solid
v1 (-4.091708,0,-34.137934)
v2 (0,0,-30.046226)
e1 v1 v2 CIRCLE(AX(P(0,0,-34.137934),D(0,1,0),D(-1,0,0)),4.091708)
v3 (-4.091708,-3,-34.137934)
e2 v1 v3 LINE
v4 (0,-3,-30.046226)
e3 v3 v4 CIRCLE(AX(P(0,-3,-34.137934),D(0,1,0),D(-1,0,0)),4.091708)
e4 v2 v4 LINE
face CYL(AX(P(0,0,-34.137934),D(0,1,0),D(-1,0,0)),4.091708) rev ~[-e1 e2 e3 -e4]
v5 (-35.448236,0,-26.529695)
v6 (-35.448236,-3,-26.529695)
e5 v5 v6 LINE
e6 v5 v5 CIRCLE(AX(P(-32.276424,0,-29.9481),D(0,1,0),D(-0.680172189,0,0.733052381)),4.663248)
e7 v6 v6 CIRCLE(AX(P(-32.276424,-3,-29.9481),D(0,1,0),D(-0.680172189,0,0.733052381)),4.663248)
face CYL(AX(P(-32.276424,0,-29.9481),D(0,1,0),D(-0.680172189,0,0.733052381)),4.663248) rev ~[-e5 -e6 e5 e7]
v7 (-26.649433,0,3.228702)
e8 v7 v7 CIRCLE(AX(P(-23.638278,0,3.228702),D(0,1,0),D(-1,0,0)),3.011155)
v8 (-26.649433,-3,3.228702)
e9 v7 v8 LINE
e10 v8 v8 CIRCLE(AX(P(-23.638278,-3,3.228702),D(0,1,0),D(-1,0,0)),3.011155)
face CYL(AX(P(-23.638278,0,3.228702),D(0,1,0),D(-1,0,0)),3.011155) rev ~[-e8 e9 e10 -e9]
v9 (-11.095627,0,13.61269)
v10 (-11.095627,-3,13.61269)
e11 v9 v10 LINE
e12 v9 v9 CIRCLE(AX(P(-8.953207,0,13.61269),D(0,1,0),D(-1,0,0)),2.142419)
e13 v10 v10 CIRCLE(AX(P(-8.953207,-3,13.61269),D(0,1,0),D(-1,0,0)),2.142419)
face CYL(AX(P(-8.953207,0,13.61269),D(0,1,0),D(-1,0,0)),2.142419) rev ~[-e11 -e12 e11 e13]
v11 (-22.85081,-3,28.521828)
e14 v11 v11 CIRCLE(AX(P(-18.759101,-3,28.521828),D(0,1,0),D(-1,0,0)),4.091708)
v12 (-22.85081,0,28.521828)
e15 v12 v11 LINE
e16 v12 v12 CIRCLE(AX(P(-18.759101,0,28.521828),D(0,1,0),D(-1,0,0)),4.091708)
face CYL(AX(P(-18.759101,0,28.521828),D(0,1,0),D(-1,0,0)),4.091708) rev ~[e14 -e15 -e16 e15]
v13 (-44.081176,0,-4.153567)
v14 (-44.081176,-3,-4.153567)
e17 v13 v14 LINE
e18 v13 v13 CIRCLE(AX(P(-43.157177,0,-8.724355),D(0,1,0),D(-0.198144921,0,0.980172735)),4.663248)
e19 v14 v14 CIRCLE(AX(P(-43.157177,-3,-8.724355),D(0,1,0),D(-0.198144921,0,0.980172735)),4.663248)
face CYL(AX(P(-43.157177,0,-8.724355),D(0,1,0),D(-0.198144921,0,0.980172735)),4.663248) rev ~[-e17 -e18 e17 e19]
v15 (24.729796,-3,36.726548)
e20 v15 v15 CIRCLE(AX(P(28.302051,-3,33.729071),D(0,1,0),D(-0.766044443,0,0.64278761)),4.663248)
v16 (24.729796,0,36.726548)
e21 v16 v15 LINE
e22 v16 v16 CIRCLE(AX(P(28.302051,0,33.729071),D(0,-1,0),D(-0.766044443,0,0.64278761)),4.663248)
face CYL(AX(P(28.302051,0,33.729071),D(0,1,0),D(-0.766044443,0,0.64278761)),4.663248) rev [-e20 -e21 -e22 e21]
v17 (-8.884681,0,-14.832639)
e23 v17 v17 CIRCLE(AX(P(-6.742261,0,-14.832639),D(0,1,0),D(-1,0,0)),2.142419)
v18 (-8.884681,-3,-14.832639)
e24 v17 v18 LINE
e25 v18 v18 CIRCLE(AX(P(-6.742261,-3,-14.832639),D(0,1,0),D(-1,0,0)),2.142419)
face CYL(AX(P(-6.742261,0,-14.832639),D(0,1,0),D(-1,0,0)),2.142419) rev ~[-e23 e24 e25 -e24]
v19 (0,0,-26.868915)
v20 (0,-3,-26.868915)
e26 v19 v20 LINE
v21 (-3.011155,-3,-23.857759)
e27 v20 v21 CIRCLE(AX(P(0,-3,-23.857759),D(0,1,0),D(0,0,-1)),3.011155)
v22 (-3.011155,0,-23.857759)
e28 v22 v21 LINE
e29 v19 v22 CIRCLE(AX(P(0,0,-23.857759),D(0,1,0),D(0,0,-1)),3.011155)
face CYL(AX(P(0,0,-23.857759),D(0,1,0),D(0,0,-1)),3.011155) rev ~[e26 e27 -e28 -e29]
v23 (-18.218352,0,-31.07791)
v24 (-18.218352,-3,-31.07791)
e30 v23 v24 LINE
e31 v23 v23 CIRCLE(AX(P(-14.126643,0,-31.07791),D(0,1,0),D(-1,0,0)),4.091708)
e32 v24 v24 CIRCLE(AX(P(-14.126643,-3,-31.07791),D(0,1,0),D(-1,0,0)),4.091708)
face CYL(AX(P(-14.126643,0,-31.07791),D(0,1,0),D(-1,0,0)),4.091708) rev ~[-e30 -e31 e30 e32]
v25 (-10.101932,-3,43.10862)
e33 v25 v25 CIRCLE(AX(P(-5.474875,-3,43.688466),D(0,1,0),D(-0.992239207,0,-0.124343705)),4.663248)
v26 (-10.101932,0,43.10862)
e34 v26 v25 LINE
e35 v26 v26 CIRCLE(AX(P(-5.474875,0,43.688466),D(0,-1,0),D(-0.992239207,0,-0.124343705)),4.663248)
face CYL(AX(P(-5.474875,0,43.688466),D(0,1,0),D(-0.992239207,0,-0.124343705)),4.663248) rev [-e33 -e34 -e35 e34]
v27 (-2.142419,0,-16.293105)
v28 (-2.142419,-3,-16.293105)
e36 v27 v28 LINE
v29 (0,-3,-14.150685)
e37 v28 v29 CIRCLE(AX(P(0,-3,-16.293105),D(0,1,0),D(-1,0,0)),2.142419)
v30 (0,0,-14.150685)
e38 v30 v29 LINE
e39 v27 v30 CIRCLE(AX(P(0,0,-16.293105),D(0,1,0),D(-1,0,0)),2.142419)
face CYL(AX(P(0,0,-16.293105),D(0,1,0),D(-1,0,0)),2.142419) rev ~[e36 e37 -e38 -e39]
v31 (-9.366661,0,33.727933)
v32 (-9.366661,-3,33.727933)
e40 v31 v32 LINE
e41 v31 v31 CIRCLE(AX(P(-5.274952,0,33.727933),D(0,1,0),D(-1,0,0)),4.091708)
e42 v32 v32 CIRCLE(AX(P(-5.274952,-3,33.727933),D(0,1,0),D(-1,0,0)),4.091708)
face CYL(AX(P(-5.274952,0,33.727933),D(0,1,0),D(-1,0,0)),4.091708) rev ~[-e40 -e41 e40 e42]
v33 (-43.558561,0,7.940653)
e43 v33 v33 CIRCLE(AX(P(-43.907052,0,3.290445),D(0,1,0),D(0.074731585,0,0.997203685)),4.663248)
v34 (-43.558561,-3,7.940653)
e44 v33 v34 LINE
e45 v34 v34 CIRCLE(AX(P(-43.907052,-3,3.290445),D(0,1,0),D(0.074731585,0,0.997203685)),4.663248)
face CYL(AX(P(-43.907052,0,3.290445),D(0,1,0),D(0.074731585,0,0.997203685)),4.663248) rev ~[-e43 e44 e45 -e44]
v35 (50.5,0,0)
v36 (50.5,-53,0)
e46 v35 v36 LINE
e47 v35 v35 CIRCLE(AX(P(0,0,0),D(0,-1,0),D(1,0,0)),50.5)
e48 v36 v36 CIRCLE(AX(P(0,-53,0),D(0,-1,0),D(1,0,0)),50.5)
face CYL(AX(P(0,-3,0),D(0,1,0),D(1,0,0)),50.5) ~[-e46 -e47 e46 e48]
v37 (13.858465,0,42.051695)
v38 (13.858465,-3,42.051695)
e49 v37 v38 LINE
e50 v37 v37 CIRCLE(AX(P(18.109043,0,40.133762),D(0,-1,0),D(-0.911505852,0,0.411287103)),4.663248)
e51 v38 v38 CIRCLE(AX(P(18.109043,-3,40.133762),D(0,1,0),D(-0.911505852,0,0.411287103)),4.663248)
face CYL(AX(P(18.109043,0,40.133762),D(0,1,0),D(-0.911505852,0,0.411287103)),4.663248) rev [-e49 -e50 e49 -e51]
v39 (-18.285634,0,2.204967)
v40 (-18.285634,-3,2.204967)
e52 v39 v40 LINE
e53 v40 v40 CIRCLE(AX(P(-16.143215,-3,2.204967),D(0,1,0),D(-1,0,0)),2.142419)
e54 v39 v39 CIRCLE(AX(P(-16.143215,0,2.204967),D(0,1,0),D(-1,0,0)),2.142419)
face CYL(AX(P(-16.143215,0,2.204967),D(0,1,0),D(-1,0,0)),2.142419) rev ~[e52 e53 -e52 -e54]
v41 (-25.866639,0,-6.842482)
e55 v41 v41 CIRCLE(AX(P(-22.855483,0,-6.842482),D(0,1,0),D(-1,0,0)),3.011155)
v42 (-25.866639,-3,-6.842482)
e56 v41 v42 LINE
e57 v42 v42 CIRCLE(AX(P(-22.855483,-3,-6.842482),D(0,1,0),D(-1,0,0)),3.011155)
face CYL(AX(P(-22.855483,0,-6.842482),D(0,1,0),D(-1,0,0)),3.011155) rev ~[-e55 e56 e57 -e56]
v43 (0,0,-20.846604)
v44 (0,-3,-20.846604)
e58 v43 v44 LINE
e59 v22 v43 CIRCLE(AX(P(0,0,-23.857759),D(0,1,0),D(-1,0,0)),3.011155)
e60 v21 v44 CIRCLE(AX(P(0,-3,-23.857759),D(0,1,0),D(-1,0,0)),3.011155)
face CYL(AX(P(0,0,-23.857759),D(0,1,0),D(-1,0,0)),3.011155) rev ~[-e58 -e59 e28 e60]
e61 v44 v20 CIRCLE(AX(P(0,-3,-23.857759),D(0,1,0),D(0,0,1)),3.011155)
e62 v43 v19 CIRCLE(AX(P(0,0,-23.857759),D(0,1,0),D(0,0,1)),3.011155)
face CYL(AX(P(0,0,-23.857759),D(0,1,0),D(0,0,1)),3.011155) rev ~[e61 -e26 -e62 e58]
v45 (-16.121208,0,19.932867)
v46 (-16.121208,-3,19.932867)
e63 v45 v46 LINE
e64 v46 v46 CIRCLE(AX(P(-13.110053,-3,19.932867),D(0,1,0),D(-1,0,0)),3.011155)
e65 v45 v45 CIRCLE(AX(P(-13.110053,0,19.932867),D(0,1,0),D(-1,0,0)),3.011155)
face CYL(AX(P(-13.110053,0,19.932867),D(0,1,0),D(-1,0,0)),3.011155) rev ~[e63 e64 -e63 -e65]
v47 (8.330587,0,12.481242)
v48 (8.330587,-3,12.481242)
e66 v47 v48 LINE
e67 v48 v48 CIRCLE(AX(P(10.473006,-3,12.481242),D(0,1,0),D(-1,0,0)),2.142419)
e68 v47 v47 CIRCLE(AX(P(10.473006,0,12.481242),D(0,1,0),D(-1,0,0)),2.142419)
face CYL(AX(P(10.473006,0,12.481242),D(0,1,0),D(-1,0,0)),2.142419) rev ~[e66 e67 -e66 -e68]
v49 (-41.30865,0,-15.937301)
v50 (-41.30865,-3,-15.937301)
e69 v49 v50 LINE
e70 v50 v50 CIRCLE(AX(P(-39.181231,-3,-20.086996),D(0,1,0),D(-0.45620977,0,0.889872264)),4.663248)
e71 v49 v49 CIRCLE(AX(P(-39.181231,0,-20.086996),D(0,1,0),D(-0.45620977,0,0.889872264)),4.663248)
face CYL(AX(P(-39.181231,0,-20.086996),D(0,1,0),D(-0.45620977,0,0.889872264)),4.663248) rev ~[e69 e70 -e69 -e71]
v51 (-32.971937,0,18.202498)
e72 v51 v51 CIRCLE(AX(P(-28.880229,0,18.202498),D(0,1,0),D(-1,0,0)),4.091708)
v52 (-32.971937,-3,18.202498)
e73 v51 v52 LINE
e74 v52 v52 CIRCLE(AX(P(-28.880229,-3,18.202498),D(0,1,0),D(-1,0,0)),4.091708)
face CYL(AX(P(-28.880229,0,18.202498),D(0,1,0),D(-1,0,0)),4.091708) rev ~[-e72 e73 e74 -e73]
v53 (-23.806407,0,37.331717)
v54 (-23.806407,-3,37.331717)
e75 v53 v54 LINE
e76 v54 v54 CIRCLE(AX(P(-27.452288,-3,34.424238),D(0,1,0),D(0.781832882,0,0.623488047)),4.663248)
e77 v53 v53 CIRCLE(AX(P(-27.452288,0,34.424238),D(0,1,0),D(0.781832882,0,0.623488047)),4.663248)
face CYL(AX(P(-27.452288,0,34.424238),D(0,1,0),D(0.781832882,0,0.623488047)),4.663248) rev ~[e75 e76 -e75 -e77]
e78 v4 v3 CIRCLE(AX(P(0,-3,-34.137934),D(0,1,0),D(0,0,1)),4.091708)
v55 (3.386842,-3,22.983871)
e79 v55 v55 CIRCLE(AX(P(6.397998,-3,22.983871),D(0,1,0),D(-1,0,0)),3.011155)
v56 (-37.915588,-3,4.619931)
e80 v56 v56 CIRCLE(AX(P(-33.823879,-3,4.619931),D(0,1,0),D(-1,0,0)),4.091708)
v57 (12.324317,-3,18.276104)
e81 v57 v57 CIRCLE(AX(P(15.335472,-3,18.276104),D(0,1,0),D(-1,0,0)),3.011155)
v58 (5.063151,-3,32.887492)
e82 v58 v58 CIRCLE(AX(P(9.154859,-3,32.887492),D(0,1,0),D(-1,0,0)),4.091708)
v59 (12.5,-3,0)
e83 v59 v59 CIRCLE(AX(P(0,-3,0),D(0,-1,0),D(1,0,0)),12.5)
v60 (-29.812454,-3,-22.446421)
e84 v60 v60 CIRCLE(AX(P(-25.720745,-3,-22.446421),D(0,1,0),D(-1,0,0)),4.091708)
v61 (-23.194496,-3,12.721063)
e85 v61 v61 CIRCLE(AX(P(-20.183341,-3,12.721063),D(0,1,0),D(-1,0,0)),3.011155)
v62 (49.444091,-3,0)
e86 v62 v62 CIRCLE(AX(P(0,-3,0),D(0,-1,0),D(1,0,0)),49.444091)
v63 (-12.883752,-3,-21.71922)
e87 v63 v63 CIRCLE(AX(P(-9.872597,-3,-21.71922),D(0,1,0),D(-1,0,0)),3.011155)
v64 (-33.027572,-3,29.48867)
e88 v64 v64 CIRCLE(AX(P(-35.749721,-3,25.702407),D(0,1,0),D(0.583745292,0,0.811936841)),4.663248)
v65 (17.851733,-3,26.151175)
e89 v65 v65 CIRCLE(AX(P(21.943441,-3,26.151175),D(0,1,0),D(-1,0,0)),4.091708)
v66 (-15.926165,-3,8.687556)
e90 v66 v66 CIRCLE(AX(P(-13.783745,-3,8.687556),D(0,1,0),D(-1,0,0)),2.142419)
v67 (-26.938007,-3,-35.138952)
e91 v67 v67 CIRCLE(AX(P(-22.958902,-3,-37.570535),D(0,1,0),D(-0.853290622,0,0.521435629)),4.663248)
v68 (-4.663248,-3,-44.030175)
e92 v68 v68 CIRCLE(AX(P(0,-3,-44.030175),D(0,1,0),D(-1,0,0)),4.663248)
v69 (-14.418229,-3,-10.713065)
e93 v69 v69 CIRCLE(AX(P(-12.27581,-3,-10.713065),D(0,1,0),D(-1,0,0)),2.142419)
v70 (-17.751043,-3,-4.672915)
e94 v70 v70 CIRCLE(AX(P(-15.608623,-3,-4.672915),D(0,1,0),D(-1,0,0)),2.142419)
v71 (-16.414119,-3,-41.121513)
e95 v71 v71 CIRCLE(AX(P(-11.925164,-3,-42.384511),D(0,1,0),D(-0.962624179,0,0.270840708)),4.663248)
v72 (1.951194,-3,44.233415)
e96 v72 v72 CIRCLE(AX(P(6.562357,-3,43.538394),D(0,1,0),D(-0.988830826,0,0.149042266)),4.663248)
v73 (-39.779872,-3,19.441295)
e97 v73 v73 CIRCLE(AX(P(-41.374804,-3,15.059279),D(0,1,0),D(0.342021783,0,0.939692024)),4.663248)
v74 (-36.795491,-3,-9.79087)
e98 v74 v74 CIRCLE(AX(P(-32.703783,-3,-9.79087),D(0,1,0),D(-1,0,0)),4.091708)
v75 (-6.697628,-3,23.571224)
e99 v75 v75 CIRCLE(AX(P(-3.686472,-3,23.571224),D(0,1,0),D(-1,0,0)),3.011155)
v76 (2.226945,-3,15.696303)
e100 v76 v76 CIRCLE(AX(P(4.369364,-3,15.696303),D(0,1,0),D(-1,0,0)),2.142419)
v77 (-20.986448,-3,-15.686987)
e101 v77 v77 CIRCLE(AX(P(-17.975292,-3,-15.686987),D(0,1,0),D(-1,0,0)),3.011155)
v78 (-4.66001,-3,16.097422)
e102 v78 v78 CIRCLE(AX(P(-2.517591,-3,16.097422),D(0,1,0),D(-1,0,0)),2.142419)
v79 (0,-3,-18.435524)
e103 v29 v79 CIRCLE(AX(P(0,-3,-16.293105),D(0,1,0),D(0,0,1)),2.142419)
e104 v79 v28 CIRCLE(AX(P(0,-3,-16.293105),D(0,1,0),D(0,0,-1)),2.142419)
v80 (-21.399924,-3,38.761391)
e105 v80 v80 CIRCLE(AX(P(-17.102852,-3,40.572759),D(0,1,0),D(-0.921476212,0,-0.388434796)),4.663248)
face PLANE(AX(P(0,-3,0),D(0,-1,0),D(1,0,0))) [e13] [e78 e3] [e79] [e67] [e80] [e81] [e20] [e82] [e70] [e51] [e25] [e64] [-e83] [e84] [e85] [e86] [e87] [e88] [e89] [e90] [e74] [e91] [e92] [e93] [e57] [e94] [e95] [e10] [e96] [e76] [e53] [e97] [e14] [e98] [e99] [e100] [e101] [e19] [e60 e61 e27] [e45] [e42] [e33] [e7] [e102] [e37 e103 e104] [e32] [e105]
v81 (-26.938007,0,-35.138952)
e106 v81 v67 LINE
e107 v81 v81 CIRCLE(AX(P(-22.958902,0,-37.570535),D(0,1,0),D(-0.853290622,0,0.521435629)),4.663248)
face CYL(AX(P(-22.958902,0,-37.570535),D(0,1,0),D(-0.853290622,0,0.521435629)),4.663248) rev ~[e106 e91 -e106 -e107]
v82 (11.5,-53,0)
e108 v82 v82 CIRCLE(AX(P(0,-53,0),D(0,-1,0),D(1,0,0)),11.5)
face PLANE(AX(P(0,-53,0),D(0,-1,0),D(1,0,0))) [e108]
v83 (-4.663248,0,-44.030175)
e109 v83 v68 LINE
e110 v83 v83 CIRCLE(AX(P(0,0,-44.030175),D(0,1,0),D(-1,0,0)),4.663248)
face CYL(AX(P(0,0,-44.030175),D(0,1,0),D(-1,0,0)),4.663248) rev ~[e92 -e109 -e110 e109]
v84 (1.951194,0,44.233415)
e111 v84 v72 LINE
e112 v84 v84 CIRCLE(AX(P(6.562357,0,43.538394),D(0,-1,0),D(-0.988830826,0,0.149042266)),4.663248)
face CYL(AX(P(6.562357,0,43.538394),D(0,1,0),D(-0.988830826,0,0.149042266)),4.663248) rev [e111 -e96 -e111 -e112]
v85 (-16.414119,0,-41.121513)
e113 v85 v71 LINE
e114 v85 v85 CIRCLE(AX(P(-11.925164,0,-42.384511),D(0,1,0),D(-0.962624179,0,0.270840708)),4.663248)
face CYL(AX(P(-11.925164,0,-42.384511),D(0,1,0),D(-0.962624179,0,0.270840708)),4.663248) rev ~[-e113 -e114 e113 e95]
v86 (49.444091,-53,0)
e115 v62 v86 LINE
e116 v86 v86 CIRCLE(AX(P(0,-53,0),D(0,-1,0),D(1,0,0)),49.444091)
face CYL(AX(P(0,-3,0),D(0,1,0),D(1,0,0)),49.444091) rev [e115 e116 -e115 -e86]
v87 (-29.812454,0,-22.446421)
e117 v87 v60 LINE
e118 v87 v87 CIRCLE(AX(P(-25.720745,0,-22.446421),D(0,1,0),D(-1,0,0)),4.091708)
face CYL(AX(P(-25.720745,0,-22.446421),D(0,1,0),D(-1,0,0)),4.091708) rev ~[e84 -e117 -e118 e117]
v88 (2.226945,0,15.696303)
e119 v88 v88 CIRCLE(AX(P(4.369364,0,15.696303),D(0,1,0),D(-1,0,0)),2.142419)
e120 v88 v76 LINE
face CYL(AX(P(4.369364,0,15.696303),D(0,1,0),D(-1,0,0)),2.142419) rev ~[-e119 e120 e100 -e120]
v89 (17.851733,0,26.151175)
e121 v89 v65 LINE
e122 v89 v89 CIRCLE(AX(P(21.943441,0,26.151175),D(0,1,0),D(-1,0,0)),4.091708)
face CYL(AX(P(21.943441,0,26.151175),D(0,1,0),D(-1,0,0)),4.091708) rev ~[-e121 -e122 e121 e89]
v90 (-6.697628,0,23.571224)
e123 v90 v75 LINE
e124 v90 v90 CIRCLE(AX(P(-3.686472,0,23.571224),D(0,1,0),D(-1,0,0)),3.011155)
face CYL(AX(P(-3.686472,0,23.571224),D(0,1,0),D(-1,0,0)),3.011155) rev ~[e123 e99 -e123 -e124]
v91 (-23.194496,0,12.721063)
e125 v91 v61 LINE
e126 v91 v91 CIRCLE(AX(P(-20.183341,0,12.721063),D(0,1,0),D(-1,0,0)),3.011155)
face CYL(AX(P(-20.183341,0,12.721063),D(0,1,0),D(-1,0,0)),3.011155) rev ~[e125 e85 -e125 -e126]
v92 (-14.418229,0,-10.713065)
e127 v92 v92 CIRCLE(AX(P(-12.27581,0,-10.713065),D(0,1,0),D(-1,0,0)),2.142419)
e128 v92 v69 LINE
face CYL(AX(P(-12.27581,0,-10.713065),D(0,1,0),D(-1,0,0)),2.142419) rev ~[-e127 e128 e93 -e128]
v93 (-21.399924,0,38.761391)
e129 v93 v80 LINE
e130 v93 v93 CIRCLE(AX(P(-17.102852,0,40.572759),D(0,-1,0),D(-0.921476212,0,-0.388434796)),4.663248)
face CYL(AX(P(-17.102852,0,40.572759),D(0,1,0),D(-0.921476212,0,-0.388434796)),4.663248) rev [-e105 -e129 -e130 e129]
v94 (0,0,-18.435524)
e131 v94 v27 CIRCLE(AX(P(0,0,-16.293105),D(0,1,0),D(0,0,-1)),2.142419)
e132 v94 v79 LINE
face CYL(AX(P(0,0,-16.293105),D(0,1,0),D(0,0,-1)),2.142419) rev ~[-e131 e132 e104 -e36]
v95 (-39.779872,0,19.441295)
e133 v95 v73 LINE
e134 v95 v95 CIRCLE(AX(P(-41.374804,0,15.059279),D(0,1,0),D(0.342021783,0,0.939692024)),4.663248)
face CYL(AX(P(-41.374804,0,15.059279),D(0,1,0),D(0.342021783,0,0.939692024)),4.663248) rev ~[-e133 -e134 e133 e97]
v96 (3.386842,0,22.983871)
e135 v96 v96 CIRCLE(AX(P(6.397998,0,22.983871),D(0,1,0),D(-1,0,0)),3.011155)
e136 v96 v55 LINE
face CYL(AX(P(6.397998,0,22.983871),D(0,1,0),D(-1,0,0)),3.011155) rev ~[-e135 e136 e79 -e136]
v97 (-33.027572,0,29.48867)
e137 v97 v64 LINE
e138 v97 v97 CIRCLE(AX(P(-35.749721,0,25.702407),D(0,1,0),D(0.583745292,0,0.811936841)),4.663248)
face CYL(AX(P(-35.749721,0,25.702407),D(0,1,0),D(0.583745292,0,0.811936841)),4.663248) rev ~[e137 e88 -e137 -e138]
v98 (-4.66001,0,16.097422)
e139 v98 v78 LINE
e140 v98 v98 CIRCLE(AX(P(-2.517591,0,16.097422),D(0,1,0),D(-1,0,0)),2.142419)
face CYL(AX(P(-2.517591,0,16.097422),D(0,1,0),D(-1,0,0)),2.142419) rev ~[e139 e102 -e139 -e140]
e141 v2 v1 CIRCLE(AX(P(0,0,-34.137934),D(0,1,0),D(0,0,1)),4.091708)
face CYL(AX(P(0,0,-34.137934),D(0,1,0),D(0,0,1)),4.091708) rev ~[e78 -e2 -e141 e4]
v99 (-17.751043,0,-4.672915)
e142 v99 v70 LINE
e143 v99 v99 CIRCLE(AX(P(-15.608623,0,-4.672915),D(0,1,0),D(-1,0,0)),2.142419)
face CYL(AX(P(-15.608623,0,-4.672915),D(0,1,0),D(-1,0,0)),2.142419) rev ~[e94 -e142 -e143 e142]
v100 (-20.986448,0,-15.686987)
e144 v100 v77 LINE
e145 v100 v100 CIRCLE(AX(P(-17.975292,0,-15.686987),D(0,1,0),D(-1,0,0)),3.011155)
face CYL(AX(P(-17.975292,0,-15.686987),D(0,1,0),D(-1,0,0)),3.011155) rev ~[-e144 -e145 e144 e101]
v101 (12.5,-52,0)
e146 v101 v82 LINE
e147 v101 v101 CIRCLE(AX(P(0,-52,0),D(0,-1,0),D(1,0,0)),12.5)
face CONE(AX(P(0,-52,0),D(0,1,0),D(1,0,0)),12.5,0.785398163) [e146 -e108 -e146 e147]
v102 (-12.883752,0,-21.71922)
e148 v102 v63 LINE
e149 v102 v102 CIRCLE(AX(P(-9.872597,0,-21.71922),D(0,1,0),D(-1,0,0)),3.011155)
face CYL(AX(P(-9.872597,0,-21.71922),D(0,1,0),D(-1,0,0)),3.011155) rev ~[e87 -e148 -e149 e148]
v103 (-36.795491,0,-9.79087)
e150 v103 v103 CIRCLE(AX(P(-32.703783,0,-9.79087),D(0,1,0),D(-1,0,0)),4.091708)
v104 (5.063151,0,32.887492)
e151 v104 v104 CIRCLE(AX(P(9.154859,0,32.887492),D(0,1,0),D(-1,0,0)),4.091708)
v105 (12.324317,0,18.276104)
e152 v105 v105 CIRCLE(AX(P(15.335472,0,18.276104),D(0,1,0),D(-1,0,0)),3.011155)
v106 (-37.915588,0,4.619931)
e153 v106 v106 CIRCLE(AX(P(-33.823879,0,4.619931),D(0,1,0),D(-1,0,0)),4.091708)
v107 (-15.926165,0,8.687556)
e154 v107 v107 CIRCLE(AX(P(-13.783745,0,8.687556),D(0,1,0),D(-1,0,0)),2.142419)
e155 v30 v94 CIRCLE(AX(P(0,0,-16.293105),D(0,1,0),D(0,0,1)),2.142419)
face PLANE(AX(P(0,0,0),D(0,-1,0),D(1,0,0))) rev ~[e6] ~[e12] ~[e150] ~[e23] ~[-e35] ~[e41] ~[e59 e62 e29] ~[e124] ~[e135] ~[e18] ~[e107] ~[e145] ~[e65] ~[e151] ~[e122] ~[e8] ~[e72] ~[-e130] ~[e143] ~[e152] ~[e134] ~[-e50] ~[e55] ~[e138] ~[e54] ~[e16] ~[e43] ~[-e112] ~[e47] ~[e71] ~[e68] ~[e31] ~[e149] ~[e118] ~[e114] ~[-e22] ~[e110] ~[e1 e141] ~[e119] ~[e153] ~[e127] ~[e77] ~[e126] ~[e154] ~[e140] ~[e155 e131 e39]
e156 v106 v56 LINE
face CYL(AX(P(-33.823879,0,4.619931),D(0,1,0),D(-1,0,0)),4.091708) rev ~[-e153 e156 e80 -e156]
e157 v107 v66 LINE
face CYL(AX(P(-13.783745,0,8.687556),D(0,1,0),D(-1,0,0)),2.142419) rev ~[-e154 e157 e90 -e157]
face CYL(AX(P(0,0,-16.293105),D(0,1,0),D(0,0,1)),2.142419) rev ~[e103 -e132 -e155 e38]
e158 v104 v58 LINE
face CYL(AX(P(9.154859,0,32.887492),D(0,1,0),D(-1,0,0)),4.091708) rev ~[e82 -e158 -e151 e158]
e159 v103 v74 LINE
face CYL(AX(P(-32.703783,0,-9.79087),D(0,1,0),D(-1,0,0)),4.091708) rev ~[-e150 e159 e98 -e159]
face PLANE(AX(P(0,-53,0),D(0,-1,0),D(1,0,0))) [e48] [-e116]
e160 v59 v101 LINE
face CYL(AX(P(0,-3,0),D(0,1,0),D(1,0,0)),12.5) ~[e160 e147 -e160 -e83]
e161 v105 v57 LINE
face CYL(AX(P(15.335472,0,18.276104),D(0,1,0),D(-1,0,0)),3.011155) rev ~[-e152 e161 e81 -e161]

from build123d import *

# Parameters (mm, degrees)
F0_R             = 50.5
F1_DEPTH         = 3
F2_R             = 50.5
F2_R_2           = 49.4440908639
F3_DEPTH         = 50
F4_R             = 12.5
F5_DEPTH         = 50
F6_SIZE          = 1
F9_R             = 4.6632476683
F10_DEPTH        = 53.001
F10_COPIES_COUNT = 10
F10_COPIES_ANGLE = 141.4287
F11_R            = 4.0917082841
F11_R_2          = 3.0111553801
F11_R_3          = 2.1424193095
F12_DEPTH        = 53.001


# Not quite as in the source:
# - a pattern or mirror of a feature is missing from the dataset's text; its kind, count and spacing are read off the source's solid


with BuildPart() as f1:
    # F0 (on Front) → F1 (new body)
    with BuildSketch(Plane.XZ):
        Circle(F0_R)
    extrude(amount=F1_DEPTH)

    # F2 (on face) → F3 (join)
    with BuildSketch(Plane.XZ.offset(3)):
        Circle(F2_R)
        Circle(F2_R_2, mode=Mode.SUBTRACT)
    extrude(amount=F3_DEPTH)

    # F4 (on face) → F5 (join)
    with BuildSketch(Plane.XZ.offset(3)):
        Circle(F4_R)
    extrude(amount=F5_DEPTH)

    # F6
    f6_edges = [f1.edges().sort_by_distance(p)[0] for p in [
        (-12.5, -53, 0),
    ]]
    chamfer(f6_edges, length=F6_SIZE)

    # F9 (on face) → F10 (cut, through all)
    with BuildSketch(Plane(origin=(0, 0, 0), x_dir=(-1, 0, 0), z_dir=(0, 1, 0))):
        with Locations((0, -44.030174613)):
            Circle(F9_R)
    f10 = extrude(amount=-F10_DEPTH, mode=Mode.SUBTRACT)

    # F10_copies: F10 ×10 about axis
    f10_copies_axis = Axis((0, 0, 0), (0, 1, 0))
    for i in range(1, F10_COPIES_COUNT):
        add(f10.rotate(f10_copies_axis, i * F10_COPIES_ANGLE / (F10_COPIES_COUNT - 1)), mode=Mode.SUBTRACT)

    # F10_copies1: F10 across plane
    add(f10.mirror(Plane(origin=(0, 0, 0), x_dir=(0.9801724878, 0, 0.1981461432), z_dir=(-0.1981461432, 0, 0.9801724878))), mode=Mode.SUBTRACT)

    # F10_copies2: F10 across plane
    add(f10.mirror(Plane(origin=(0, 0, 0), x_dir=(0.9980579158, 0, 0.0622928302), z_dir=(-0.0622928302, 0, 0.9980579158))), mode=Mode.SUBTRACT)

    # F10_copies3: F10 across plane
    add(f10.mirror(Plane(origin=(0, 0, 0), x_dir=(0.9972037972, 0, -0.0747300936), z_dir=(0.0747300936, 0, 0.9972037972))), mode=Mode.SUBTRACT)

    # F10_copies4: F10 across plane
    add(f10.mirror(Plane(origin=(0, 0, 0), x_dir=(0.9776261689, 0, -0.2103498843), z_dir=(0.2103498843, 0, 0.9776261689))), mode=Mode.SUBTRACT)

    # F10_copies5: F10 across plane
    add(f10.mirror(Plane(origin=(0, 0, 0), x_dir=(0.9396926208, 0, -0.3420201433), z_dir=(0.3420201433, 0, 0.9396926208))), mode=Mode.SUBTRACT)

    # F11 (on face) → F12 (cut, through all)
    with BuildSketch(Plane(origin=(0, 0, 0), x_dir=(-1, 0, 0), z_dir=(0, 1, 0))):
        with Locations((-9.1548590747, 32.8874919017)):
            Circle(F11_R)
        with Locations((-6.3979976493, 22.98387055)):
            Circle(F11_R_2)
        with Locations((-4.3693644676, 15.6963026268)):
            Circle(F11_R_3)
        with Locations((-10.4730058489, 12.4812423457)):
            Circle(F11_R_3)
        with Locations((-15.3354720805, 18.2761039461)):
            Circle(F11_R_2)
        with Locations((-21.9434412824, 26.1511749822)):
            Circle(F11_R)
        with Locations((5.2749524196, 33.7279327151)):
            Circle(F11_R)
        with Locations((3.686472168, 23.5712240313)):
            Circle(F11_R_2)
        with Locations((2.5175908752, 16.0974220976)):
            Circle(F11_R_3)
        with Locations((18.7591014711, 28.5218281367)):
            Circle(F11_R)
        with Locations((13.1100529385, 19.9328671126)):
            Circle(F11_R_2)
        with Locations((8.9532073342, 13.6126904187)):
            Circle(F11_R_3)
        with Locations((28.8802291505, 18.2024979735)):
            Circle(F11_R)
        with Locations((20.1833405306, 12.7210630218)):
            Circle(F11_R_2)
        with Locations((13.7837454444, 8.6875556704)):
            Circle(F11_R_3)
        with Locations((33.8238792195, 4.6199310394)):
            Circle(F11_R)
        with Locations((25.7207452383, -22.4464213773)):
            Circle(F11_R)
        with Locations((17.9752922715, -15.6869865537)):
            Circle(F11_R_2)
        with Locations((32.7037831717, -9.7908699573)):
            Circle(F11_R)
        with Locations((22.855483208, -6.8424824959)):
            Circle(F11_R_2)
        with Locations((14.1266433863, -31.0779104011)):
            Circle(F11_R)
        with BuildLine():
            ThreePointArc((0, -30.0462261622), (-2.8932746743, -37.0312091207), (4.0917082841, -34.1379344463))
            ThreePointArc((4.0917082841, -34.1379344463), (2.8932746743, -31.244659772), (0, -30.0462261622))
        make_face()
        with BuildLine():
            ThreePointArc((0, -20.8466039317), (-3.0111553801, -23.8577593118), (0, -26.8689146919))
            Line((0, -26.8689146919), (0, -20.8466039317))
        make_face()
        with BuildLine():
            Line((0, -20.8466039317), (0, -26.8689146919))
            ThreePointArc((0, -26.8689146919), (2.1292083885, -25.9869677003), (3.0111553801, -23.8577593118))
            ThreePointArc((3.0111553801, -23.8577593118), (2.1292083885, -21.7285509233), (0, -20.8466039317))
        make_face()
        with Locations((9.8725966659, -21.7192199319)):
            Circle(F11_R_2)
        with BuildLine():
            ThreePointArc((0, -14.1506854285), (-2.1424193095, -16.293104738), (0, -18.4355240475))
            Line((0, -18.4355240475), (0, -14.1506854285))
        make_face()
        with BuildLine():
            Line((0, -14.1506854285), (0, -18.4355240475))
            ThreePointArc((0, -18.4355240475), (1.5149192219, -17.8080239599), (2.1424193095, -16.293104738))
            ThreePointArc((2.1424193095, -16.293104738), (1.5149192219, -14.7781855161), (0, -14.1506854285))
        make_face()
        with Locations((6.7422614761, -14.8326387468)):
            Circle(F11_R_3)
        with Locations((12.2758099722, -10.7130645256)):
            Circle(F11_R_3)
        with Locations((15.6086234621, -4.6729151098)):
            Circle(F11_R_3)
        with Locations((23.6382775495, 3.2287015768)):
            Circle(F11_R_2)
        with Locations((16.1432147465, 2.2049670412)):
            Circle(F11_R_3)
    extrude(amount=-F12_DEPTH, mode=Mode.SUBTRACT)


solid = f1.part
